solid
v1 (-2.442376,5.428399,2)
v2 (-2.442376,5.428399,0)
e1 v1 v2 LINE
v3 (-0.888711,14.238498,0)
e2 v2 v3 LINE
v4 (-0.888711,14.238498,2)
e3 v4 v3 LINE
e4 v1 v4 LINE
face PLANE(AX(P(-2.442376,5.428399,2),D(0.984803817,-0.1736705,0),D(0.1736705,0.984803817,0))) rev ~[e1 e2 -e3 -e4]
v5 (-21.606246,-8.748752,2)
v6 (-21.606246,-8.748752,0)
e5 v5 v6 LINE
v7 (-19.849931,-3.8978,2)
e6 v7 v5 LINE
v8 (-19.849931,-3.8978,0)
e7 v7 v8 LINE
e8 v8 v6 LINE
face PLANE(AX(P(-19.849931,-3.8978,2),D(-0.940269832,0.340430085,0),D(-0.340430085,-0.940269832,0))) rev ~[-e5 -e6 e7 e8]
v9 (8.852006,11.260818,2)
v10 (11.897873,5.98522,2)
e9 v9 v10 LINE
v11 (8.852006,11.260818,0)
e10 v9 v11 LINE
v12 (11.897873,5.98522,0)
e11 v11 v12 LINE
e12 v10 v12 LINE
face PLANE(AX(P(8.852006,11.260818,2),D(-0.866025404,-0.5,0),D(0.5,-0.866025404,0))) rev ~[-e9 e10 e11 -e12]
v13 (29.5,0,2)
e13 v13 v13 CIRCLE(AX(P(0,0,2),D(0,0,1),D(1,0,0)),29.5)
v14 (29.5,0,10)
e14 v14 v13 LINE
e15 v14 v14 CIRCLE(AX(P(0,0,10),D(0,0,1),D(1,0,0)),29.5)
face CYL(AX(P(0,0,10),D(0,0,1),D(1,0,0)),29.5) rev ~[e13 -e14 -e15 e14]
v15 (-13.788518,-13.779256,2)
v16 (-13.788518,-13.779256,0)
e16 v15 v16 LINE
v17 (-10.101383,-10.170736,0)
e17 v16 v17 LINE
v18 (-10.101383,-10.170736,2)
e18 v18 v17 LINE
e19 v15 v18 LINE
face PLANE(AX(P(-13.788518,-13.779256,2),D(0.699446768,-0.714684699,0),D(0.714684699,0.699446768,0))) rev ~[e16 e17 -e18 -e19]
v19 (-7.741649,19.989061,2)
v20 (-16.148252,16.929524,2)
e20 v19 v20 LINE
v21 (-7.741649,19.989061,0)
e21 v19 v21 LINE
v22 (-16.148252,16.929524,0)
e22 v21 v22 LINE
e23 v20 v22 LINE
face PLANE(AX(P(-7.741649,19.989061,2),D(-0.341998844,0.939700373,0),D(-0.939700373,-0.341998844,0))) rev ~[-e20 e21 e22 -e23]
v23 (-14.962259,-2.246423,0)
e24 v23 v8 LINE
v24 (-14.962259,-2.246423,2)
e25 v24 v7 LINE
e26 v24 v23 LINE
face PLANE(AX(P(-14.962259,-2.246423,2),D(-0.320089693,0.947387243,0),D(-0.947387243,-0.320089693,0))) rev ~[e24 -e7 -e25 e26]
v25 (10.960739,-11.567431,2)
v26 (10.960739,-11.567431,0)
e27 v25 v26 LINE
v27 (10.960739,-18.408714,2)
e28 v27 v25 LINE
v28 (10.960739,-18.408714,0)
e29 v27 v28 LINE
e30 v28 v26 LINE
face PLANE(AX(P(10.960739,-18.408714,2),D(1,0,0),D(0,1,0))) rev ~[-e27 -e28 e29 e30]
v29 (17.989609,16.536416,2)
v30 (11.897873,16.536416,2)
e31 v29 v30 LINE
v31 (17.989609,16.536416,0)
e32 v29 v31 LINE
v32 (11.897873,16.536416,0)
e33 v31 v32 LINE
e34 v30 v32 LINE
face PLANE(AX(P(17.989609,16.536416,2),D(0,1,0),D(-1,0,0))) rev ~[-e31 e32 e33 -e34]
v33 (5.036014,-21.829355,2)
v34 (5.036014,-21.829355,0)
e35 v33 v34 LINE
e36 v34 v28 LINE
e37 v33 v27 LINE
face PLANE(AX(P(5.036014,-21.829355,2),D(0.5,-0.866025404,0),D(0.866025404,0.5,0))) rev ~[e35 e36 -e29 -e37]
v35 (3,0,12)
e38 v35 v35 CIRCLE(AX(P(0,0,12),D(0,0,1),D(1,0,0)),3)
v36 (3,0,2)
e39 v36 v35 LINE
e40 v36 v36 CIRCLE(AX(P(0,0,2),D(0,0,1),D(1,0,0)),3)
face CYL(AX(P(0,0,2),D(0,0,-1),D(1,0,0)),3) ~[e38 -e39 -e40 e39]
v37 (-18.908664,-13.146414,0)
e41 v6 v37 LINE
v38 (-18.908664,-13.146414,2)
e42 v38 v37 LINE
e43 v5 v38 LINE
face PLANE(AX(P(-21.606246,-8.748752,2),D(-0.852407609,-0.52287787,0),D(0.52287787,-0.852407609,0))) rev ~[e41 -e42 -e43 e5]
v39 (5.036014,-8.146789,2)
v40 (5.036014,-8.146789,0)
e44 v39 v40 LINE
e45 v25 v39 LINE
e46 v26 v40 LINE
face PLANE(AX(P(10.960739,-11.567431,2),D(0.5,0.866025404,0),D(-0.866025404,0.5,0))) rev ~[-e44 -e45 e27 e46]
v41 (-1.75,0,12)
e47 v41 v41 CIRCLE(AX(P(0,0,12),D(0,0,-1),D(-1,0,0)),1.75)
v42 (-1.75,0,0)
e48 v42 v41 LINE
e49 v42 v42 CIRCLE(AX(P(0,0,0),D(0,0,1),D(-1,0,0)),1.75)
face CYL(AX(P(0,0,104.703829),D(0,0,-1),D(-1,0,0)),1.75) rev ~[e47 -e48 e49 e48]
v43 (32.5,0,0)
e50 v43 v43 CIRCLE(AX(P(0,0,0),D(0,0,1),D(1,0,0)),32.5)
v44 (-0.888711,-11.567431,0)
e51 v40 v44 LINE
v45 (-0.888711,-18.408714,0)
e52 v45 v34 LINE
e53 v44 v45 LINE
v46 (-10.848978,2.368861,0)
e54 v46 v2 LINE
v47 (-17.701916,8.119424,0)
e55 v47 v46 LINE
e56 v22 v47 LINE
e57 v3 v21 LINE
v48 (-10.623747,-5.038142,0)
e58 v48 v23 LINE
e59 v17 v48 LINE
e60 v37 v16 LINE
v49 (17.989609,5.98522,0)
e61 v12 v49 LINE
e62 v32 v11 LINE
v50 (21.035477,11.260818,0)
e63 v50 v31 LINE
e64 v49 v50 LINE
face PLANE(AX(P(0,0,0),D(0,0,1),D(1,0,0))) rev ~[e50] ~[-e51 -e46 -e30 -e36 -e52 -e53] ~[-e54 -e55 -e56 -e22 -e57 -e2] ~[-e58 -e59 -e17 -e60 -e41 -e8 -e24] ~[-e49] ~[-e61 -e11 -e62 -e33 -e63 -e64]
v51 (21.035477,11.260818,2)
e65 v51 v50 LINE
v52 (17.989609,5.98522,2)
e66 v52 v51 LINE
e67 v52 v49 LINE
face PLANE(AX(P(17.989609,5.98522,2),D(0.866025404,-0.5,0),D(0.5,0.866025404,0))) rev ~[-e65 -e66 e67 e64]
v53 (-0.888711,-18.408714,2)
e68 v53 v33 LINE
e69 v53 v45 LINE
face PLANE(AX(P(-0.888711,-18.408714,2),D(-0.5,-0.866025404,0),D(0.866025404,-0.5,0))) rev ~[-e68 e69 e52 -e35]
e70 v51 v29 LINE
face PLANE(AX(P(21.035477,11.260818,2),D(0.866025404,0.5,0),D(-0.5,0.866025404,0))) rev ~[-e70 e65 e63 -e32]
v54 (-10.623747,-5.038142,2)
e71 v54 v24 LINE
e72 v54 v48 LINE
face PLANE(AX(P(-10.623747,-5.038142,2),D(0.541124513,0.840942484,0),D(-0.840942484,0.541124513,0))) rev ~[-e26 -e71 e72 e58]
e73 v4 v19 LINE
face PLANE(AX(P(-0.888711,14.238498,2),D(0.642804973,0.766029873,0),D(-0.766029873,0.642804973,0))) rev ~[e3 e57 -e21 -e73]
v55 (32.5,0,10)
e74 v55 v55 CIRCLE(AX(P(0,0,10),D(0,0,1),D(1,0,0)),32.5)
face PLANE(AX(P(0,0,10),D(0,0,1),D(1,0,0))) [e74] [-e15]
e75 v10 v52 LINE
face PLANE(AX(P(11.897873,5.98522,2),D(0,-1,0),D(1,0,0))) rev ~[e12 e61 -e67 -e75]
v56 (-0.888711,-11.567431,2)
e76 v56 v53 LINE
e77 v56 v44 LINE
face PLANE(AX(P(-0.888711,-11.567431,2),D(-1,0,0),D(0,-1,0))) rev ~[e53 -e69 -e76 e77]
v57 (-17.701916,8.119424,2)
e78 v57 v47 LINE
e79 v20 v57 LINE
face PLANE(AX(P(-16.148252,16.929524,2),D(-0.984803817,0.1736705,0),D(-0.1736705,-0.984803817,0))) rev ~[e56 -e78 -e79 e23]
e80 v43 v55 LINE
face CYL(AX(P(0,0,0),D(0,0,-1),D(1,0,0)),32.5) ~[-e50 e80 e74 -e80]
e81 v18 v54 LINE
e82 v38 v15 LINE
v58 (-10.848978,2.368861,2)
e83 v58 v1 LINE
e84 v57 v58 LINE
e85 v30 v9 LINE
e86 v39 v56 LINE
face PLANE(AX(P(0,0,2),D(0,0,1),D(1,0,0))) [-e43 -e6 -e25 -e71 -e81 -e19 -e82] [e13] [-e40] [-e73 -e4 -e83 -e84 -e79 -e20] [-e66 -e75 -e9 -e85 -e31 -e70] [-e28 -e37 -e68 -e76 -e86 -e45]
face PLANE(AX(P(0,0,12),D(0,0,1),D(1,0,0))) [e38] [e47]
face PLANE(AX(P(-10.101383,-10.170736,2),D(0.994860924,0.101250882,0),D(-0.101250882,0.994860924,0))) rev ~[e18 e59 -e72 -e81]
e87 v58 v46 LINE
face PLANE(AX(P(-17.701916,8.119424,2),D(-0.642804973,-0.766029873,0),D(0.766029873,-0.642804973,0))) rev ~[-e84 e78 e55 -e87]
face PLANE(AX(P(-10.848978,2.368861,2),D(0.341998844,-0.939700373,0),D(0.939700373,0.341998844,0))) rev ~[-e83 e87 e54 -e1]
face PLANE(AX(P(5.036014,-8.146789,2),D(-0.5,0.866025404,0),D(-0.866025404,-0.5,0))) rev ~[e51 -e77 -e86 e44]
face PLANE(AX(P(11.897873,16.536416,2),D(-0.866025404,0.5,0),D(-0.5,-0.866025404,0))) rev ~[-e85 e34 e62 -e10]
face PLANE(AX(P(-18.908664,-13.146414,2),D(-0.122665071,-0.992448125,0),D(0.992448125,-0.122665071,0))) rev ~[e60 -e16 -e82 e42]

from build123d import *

# Parameters (mm, degrees)
F0_R      = 32.5
F1_DEPTH  = 10
F2_R      = 29.5
F3_DEPTH  = 8
F6_D      = 3.5
F8_DEPTH  = 2
F9_DEPTH  = 2
F10_DEPTH = 2
F11_DEPTH = 2
F4_R      = 3
F12_DEPTH = 10
F14_D     = 3.5


# Not quite as in the source:
# - the program builds the solid bodies; features that only make, move or delete a surface that nothing else refers to are left out


with BuildPart() as f1:
    # F0 (on Top) → F1 (new body)
    with BuildSketch(Plane.XY):
        Circle(F0_R)
    extrude(amount=F1_DEPTH)

    # F2 (on face) → F3 (cut)
    with BuildSketch(Plane.XY.offset(10)):
        Circle(F2_R)
    extrude(amount=-F3_DEPTH, mode=Mode.SUBTRACT)

    # F6 (through all)
    with Locations(Plane(origin=(0, 0, 0), x_dir=(1, 0, 0), z_dir=(0, 0, -1))):
        with Locations((0, 0)):
            Hole(F6_D / 2)

    # F7 (on face) → F8 (cut, through all)
    with BuildSketch(Plane.XY.offset(2)):
        Polygon((-7.741649435, 19.9890607288), (-16.1482516815, 16.9295235286), (-17.7019158656, 8.1194238235), (-10.8489778032, 2.3688613186), (-2.4423755567, 5.4283985188), (-0.8887113726, 14.2384982239), align=None)
    extrude(amount=-F8_DEPTH, mode=Mode.SUBTRACT)

    # F7 (on face) → F9 (cut, through all)
    with BuildSketch(Plane.XY.offset(2)):
        Polygon((-0.8887113726, -11.5674306203), (-0.8887113726, -18.4087138127), (5.0360136665, -21.8293554089), (10.9607387056, -18.4087138127), (10.9607387056, -11.5674306203), (5.0360136665, -8.1467890241), align=None)
    extrude(amount=-F9_DEPTH, mode=Mode.SUBTRACT)

    # F7 (on face) → F10 (cut, through all)
    with BuildSketch(Plane.XY.offset(2)):
        Polygon((-13.7885178521, -13.7792561938), (-10.1013832644, -10.1707357179), (-10.6237473641, -5.0381421005), (-14.9622593298, -2.2464230215), (-19.8499311619, -3.897799888), (-21.6062462804, -8.7487522375), (-18.9086635788, -13.1464140096), align=None)
    extrude(amount=-F10_DEPTH, mode=Mode.SUBTRACT)

    # F7 (on face) → F11 (cut, through all)
    with BuildSketch(Plane.XY.offset(2)):
        Polygon((11.8978734544, 5.9852199629), (17.9896090695, 5.9852199629), (21.0354768771, 11.2608177587), (17.9896090695, 16.5364155546), (11.8978734544, 16.5364155546), (8.8520056468, 11.2608177587), align=None)
    extrude(amount=-F11_DEPTH, mode=Mode.SUBTRACT)

    # F4 (on face) → F12 (join)
    with BuildSketch(Plane.XY.offset(2)):
        Circle(F4_R)
    extrude(amount=F12_DEPTH)

    # F14 (through all)
    with Locations(Plane.XY.offset(12)):
        with Locations((0, 0)):
            Hole(F14_D / 2)


solid = f1.part
